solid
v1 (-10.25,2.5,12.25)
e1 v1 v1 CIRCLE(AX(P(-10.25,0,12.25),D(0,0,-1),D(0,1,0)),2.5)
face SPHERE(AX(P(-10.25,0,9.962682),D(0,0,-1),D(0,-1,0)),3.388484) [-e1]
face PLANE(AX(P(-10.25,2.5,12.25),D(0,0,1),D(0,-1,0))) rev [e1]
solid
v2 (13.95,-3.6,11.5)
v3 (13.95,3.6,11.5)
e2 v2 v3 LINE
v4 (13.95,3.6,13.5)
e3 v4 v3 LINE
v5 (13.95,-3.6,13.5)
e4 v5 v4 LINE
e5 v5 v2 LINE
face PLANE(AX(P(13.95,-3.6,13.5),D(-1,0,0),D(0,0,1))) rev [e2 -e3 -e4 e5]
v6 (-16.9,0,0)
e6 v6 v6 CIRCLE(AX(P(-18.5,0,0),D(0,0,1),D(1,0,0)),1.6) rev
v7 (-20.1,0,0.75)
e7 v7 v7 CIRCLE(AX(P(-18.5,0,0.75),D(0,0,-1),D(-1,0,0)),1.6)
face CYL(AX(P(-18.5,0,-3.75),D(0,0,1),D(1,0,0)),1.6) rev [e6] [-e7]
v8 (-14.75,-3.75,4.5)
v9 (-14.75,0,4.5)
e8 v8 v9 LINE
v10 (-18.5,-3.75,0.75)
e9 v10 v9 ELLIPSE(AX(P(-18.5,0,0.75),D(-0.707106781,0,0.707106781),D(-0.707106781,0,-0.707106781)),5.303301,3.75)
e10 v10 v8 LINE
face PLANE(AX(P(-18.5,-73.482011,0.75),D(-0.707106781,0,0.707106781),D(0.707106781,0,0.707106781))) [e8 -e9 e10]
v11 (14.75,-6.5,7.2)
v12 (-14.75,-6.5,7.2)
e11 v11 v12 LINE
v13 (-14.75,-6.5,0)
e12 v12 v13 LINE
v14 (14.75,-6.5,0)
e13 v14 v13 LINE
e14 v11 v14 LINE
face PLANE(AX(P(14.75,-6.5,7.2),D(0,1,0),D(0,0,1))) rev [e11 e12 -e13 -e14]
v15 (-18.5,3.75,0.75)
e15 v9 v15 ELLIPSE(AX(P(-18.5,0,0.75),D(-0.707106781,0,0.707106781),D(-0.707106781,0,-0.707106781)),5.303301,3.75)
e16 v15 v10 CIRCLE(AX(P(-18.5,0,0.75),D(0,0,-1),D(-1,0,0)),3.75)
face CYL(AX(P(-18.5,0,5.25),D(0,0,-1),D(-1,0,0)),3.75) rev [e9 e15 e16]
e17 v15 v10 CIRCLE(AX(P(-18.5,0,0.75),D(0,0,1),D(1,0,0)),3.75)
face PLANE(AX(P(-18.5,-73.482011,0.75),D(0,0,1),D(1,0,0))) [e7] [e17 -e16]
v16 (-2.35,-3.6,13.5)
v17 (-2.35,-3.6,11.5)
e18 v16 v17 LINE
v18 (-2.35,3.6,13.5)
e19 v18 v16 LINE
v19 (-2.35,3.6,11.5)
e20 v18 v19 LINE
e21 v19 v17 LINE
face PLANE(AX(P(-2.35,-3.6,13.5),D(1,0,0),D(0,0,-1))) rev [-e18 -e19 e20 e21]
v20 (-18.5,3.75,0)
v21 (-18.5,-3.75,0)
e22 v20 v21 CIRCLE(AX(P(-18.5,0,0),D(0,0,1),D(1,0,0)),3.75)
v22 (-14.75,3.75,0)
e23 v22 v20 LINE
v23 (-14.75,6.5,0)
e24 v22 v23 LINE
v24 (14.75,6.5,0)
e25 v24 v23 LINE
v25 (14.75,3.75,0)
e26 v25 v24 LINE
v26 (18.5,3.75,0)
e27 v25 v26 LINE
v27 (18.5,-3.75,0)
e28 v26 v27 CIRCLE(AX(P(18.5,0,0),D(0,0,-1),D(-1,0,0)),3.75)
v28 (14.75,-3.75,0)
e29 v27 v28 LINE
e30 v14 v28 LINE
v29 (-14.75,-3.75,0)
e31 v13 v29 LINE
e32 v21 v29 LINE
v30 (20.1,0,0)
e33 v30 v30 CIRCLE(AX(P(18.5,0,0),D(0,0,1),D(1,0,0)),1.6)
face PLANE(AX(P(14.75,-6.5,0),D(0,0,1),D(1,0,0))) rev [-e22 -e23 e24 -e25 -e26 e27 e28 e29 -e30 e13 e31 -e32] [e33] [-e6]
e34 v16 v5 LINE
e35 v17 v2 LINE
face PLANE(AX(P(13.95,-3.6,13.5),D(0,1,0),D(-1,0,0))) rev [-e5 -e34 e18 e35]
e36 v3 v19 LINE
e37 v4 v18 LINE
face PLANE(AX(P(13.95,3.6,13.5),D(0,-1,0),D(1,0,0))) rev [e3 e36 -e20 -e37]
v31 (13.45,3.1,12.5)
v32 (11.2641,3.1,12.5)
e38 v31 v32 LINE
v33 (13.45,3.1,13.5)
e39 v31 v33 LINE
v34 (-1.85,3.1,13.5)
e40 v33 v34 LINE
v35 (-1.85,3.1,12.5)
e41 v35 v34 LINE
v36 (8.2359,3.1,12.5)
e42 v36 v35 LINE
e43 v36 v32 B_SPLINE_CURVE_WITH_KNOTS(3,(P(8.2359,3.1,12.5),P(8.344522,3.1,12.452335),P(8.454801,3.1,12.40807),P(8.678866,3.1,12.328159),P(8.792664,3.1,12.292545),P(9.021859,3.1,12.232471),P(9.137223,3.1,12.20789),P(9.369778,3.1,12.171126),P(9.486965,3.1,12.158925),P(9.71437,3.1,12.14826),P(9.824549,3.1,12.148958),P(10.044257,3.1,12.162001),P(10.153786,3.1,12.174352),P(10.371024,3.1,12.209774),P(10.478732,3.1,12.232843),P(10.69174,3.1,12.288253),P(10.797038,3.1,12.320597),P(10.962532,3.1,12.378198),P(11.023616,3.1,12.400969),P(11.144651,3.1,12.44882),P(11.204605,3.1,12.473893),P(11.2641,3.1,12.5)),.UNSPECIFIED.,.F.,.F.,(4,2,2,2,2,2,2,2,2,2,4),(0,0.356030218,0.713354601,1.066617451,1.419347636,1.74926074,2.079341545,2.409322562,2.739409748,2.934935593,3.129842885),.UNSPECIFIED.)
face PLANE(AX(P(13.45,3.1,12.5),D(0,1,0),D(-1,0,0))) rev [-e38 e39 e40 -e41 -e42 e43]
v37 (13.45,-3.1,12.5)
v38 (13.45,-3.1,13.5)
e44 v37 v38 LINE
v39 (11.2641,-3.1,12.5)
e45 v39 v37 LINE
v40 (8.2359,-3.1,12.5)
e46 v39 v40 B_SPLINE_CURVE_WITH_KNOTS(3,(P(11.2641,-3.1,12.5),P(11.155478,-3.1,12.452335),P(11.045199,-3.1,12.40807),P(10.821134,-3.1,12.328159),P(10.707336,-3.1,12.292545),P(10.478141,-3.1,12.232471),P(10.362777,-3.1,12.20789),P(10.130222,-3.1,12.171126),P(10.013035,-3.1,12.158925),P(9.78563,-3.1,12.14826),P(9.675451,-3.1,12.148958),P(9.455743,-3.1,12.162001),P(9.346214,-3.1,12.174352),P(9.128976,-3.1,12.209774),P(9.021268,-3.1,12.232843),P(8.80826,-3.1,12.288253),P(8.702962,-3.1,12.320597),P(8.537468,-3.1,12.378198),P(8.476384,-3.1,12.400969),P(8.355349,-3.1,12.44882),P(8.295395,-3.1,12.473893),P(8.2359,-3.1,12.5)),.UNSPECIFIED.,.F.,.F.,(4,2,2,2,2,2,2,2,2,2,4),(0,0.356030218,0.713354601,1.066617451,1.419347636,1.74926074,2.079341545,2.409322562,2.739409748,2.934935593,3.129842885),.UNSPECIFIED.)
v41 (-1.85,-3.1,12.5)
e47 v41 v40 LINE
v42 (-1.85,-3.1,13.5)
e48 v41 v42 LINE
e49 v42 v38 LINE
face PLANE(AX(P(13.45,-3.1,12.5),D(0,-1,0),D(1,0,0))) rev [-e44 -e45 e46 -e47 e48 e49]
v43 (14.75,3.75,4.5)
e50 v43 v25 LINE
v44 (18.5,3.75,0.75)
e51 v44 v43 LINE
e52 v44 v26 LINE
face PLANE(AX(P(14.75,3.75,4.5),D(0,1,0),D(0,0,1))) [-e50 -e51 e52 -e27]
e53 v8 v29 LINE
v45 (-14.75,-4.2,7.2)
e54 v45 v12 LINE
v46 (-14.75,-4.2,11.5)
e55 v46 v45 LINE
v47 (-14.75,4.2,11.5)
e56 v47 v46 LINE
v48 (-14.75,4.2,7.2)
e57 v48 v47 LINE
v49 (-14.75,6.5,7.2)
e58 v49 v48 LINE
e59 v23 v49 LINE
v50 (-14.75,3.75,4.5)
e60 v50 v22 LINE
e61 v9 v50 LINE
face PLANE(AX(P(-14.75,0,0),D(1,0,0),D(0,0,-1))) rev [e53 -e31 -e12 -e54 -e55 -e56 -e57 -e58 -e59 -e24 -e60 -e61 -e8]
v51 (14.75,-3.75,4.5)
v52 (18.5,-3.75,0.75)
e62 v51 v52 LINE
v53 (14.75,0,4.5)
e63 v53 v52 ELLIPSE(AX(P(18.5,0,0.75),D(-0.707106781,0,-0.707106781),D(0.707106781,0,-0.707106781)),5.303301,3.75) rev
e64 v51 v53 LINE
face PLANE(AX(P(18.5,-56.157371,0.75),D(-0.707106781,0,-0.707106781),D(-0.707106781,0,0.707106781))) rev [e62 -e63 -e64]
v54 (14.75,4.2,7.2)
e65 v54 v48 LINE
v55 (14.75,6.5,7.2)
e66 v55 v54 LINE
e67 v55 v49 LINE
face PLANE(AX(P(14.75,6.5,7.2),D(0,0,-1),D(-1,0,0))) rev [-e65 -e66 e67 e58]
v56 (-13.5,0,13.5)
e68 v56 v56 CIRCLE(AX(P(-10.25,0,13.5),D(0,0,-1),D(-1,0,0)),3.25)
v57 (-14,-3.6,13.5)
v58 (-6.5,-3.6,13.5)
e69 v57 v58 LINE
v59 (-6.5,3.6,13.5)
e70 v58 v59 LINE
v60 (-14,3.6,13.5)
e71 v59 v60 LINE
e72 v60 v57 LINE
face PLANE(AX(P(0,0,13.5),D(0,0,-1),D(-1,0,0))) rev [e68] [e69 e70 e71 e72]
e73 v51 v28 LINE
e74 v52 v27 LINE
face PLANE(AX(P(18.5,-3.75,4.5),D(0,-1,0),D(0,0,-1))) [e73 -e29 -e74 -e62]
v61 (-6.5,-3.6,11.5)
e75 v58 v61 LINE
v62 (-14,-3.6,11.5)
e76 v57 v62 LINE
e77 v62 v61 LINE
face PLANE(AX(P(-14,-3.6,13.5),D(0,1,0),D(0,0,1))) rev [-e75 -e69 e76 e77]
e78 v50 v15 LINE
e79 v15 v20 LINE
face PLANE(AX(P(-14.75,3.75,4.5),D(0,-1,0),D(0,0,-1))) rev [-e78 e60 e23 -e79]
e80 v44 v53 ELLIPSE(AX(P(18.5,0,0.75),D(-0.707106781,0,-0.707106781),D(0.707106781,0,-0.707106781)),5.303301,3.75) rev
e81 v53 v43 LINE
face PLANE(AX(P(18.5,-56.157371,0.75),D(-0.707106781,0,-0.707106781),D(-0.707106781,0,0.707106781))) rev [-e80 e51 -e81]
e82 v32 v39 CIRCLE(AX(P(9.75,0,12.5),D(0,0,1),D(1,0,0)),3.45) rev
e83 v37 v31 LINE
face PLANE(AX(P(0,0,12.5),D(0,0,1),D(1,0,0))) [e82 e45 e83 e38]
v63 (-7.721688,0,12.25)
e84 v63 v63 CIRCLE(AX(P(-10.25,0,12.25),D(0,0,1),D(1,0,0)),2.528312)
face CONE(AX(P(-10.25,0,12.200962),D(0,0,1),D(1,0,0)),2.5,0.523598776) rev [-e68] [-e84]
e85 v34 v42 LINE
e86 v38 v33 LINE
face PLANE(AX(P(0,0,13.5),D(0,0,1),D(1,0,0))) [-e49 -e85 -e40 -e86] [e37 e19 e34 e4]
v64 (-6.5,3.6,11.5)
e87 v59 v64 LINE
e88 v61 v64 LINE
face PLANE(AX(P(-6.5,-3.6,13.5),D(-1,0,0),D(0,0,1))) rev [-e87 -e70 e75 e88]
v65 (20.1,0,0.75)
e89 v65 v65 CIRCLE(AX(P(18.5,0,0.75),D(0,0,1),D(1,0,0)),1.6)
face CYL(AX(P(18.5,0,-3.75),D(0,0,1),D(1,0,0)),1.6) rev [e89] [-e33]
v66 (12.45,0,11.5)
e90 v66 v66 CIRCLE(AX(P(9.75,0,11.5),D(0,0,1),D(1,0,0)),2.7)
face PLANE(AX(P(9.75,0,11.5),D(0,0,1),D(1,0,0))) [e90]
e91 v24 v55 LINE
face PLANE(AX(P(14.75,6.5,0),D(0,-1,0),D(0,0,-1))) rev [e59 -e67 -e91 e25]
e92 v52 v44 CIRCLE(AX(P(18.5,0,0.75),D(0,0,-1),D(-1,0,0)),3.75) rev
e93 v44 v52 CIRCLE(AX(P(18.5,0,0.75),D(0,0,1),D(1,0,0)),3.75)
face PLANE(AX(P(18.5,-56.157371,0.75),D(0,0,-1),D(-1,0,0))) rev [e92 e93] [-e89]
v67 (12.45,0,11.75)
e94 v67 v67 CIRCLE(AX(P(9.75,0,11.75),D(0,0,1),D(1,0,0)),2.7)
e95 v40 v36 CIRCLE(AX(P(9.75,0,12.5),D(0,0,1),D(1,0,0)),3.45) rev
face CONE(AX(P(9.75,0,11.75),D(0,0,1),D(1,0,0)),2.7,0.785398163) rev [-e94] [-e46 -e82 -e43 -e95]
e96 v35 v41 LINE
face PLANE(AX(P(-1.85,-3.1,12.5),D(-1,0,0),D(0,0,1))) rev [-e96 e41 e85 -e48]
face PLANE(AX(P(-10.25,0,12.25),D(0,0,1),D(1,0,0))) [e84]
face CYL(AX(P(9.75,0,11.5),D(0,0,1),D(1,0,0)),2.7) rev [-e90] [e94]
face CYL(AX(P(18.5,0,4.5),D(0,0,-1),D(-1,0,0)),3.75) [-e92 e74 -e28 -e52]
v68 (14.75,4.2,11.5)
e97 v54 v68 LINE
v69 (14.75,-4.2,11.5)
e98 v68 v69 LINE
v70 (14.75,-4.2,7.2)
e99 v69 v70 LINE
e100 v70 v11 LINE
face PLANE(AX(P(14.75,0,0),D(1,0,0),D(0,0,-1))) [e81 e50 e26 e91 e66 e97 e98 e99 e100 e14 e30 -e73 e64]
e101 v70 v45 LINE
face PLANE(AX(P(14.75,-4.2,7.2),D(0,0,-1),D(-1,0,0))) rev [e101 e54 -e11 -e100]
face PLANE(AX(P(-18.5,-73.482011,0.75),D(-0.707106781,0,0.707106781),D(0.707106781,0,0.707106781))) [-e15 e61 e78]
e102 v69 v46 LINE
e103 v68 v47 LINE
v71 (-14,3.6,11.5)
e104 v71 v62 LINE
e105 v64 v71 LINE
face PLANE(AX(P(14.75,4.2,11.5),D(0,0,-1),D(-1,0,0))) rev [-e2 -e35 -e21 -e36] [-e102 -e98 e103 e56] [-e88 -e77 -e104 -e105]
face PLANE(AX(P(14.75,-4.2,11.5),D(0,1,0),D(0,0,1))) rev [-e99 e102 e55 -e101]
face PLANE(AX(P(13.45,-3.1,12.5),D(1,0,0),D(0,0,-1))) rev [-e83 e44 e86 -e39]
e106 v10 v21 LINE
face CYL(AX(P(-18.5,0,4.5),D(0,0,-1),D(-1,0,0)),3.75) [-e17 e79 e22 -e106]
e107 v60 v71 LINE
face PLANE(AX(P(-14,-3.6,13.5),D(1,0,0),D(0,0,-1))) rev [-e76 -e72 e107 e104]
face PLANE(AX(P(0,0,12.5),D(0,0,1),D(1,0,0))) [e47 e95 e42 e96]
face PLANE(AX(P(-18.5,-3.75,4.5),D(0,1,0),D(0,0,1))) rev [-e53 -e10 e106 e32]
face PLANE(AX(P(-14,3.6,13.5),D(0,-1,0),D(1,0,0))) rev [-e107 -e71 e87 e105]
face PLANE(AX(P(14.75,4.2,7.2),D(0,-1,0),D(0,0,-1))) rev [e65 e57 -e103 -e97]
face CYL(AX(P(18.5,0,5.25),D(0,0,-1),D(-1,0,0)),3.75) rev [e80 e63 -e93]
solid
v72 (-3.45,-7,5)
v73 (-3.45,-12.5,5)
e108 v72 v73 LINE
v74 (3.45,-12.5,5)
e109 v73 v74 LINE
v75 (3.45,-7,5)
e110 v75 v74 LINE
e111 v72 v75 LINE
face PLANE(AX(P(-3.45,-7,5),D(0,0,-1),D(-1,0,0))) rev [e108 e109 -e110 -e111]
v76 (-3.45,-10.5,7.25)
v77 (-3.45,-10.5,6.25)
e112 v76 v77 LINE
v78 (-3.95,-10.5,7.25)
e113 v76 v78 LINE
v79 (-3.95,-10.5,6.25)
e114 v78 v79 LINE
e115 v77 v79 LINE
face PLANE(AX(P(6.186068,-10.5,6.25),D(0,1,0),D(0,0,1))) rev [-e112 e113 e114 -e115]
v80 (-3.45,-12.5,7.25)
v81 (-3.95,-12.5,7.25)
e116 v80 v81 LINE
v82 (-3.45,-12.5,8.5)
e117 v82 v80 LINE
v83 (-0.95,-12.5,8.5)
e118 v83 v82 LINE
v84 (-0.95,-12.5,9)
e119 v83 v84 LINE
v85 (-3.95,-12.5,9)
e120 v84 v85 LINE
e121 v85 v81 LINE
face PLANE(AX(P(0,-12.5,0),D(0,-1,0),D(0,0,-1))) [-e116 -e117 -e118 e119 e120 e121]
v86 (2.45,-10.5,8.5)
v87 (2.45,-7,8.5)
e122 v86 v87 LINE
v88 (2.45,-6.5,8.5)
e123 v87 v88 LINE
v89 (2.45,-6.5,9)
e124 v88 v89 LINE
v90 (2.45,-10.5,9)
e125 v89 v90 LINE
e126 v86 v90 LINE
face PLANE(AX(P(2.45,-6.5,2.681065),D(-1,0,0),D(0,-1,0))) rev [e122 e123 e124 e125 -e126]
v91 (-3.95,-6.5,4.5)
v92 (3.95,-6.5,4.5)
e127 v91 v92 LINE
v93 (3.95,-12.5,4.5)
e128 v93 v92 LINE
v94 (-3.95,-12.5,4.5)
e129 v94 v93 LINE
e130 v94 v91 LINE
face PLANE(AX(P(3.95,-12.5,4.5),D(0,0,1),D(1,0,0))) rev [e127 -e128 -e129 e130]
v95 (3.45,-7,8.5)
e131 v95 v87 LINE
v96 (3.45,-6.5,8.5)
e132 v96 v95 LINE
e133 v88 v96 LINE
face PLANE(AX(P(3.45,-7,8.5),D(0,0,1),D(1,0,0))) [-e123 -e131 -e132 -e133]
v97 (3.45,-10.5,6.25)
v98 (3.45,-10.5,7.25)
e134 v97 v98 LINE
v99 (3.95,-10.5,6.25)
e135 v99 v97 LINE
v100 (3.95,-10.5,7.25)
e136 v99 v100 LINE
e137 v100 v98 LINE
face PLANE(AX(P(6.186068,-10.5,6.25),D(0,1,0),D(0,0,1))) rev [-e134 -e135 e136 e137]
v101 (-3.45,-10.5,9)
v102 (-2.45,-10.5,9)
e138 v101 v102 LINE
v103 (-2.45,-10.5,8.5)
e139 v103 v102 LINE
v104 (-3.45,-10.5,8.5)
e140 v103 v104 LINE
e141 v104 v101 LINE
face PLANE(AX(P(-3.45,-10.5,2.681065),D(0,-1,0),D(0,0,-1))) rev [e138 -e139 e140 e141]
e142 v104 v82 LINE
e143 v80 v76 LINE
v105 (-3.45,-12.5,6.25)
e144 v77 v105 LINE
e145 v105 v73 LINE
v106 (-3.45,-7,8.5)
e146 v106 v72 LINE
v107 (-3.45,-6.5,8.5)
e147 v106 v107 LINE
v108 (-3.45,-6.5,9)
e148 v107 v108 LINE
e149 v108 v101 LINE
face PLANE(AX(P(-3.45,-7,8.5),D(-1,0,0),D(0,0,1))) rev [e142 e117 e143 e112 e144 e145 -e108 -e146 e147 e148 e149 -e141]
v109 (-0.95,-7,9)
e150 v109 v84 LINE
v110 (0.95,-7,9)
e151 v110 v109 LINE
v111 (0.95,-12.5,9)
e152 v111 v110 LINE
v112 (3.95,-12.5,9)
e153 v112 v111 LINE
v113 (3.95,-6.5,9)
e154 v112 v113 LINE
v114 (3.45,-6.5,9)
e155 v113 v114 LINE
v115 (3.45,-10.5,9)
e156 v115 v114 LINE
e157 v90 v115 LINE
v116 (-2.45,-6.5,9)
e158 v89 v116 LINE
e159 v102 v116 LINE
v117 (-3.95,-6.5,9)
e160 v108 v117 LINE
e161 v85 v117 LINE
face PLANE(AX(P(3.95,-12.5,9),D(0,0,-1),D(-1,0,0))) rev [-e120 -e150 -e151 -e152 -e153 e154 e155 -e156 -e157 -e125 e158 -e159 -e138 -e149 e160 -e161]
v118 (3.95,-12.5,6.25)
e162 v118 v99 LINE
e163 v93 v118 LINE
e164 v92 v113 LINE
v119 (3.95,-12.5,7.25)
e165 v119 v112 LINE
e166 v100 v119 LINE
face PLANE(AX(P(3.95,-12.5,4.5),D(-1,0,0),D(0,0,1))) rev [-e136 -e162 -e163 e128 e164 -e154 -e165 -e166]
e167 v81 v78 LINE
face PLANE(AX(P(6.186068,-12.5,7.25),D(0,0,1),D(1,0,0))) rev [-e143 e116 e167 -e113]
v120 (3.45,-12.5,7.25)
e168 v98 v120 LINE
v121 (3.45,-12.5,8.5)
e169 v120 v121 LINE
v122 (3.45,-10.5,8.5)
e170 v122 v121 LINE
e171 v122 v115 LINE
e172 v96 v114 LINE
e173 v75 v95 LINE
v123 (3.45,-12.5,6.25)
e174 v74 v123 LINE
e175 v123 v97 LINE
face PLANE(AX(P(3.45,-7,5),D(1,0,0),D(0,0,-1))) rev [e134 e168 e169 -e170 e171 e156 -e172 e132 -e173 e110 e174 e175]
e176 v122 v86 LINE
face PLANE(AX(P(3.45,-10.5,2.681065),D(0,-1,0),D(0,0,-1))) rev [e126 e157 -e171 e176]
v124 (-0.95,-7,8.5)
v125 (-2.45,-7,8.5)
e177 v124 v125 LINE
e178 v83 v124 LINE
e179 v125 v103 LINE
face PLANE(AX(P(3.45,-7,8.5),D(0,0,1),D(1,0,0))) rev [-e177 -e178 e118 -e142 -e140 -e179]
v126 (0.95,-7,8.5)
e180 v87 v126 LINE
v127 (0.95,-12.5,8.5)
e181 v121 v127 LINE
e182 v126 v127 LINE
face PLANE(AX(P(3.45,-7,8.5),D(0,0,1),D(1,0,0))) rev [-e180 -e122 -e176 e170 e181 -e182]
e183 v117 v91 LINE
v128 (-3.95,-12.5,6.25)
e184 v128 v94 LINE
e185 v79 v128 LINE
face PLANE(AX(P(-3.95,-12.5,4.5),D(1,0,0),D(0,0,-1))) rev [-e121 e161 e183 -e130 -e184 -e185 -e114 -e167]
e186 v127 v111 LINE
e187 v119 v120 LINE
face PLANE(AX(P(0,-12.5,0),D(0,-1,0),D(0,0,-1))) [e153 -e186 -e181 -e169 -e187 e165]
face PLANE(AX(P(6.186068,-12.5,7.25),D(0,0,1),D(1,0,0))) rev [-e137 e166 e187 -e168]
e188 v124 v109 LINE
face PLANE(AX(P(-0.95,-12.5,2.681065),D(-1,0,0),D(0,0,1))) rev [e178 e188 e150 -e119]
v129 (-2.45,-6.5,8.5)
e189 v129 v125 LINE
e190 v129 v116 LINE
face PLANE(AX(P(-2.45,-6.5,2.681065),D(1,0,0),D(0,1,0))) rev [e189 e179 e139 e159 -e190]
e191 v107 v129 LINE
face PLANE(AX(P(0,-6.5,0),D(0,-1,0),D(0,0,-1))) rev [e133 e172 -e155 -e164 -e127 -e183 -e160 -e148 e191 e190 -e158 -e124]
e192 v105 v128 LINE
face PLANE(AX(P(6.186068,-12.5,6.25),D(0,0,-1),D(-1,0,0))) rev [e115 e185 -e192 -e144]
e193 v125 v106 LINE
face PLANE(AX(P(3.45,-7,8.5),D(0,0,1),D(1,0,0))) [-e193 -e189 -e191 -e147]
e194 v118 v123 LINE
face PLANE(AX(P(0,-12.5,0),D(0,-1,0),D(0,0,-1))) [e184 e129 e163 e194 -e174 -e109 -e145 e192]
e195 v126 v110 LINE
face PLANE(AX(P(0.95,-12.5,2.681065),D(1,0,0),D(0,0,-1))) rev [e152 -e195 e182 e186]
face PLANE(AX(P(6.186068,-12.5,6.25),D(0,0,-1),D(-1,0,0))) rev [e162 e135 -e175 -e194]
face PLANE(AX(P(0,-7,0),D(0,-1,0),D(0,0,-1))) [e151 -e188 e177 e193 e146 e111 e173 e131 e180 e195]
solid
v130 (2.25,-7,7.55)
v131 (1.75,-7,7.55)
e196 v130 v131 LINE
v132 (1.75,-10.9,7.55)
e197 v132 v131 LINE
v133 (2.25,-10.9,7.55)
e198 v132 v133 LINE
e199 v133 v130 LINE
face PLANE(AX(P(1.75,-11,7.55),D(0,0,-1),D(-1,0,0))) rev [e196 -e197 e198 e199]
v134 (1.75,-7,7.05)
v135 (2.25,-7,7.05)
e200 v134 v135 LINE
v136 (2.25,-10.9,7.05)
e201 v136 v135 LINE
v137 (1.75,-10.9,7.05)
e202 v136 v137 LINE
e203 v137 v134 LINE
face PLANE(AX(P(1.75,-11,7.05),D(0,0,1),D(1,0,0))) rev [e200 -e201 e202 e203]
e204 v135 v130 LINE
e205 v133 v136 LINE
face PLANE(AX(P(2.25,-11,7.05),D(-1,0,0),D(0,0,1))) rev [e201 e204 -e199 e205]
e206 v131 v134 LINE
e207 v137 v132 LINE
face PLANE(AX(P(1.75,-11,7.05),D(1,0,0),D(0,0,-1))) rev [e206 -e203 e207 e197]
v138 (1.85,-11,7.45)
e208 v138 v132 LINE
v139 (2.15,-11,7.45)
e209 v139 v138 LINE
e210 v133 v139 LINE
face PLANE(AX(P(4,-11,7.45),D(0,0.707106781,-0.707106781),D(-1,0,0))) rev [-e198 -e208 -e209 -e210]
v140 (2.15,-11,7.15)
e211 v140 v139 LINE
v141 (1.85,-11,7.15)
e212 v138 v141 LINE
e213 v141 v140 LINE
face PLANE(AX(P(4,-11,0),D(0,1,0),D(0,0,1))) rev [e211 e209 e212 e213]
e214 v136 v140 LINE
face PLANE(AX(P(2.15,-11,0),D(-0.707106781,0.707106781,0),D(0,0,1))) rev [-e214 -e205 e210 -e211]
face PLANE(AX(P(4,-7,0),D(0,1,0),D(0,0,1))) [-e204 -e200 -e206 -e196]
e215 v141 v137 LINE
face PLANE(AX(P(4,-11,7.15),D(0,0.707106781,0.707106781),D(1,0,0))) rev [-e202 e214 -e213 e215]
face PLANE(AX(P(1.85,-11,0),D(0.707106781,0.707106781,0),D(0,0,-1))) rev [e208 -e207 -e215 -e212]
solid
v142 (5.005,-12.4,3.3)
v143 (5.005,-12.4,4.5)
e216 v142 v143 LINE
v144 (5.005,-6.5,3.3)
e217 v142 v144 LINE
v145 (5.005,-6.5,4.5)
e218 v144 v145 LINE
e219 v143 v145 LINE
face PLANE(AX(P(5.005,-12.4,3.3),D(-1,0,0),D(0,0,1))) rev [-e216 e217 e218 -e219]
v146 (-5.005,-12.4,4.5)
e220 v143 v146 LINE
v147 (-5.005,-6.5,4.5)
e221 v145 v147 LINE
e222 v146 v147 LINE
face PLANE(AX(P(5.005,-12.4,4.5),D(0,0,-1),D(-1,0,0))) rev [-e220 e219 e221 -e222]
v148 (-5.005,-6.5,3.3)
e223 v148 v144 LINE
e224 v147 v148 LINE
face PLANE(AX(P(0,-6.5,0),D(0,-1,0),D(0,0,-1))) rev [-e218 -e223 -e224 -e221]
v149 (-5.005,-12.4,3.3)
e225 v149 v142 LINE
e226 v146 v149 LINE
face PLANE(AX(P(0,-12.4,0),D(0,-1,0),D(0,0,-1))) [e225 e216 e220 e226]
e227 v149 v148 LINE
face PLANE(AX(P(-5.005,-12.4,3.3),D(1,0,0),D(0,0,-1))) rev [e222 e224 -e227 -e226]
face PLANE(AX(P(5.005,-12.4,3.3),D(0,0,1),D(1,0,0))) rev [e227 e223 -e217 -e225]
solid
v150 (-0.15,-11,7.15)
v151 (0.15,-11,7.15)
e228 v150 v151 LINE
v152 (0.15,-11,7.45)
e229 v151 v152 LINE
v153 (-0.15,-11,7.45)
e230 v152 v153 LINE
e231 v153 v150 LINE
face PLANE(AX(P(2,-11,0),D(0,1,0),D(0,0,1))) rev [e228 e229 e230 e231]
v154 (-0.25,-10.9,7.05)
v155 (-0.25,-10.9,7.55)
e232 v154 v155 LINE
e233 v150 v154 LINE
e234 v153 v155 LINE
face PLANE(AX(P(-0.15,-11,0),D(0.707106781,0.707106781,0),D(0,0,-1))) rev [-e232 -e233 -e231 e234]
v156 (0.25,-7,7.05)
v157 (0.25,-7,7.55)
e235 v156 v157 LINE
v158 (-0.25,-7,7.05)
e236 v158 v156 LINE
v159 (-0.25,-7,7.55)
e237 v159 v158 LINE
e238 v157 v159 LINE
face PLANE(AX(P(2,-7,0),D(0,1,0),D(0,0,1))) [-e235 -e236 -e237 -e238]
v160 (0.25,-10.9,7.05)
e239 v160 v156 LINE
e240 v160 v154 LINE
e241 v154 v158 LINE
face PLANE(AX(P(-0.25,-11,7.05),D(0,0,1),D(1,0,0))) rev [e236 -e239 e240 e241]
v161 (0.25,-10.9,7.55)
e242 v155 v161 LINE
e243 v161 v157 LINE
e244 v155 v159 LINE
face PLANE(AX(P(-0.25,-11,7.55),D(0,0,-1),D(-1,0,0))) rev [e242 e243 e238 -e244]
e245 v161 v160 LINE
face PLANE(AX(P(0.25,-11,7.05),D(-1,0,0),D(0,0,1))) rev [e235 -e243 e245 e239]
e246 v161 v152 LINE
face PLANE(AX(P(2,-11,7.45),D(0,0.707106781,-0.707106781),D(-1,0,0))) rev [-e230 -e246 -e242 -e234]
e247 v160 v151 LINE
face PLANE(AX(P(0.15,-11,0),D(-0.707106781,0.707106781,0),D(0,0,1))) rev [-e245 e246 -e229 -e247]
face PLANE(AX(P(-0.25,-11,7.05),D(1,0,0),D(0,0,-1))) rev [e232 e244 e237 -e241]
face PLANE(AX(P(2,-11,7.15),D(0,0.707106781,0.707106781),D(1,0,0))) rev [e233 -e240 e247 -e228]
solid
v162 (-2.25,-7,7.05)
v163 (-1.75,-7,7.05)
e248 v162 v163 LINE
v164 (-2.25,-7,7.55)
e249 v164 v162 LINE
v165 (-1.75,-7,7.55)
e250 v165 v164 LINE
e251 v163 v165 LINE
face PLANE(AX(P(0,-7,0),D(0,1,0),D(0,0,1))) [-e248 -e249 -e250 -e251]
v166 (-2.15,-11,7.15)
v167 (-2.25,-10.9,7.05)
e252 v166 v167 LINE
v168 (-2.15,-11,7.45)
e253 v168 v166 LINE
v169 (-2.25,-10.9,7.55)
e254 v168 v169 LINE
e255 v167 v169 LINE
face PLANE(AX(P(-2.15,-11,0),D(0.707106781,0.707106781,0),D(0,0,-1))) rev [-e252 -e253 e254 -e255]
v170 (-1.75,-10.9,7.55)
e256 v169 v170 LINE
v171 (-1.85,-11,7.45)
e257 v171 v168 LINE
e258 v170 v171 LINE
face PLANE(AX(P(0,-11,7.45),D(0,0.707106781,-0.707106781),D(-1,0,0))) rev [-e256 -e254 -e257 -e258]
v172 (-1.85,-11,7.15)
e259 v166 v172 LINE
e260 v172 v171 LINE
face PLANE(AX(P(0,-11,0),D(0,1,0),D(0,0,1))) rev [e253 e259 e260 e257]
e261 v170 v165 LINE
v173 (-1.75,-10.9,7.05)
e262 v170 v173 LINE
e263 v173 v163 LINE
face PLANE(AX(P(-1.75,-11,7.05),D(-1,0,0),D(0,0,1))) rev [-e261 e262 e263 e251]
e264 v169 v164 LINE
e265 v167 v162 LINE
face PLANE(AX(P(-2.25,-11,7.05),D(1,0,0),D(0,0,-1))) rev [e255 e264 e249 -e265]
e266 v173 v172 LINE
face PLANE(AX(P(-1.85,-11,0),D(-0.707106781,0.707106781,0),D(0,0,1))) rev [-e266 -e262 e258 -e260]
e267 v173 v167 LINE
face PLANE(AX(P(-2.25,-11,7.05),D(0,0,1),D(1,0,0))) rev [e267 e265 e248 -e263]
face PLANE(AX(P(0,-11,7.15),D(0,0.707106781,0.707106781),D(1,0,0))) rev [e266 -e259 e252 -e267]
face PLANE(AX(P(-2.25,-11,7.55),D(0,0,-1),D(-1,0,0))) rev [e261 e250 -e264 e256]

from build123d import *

# Parameters (mm, degrees)
BOSS_EXTRUDE5_DEPTH  = 14.75
SKETCH9_W            = 7.5
SKETCH9_H            = 7.2
SKETCH9_W_2          = 16.3
BOSS_EXTRUDE6_DEPTH  = 2
SKETCH10_W           = 15.3
SKETCH10_H           = 6.2
CUT_EXTRUDE4_DEPTH   = 1
SKETCH11_R           = 2.5
CUT_EXTRUDE5_DEPTH   = 1.25
BOSS_EXTRUDE7_DEPTH  = 4.5
CUT_EXTRUDE7_START   = -7.5
CUT_EXTRUDE7_DEPTH   = 7.5
SKETCH18_R           = 3.75
CUT_EXTRUDE8_DEPTH   = 4.5
SKETCH19_R           = 1.6
CUT_EXTRUDE9_DEPTH   = 4.5
CHAMFER1_SIZE        = 0.75
CHAMFER1_SIZE_2      = 1.299038106
SKETCH13_R           = 2.7
CUT_EXTRUDE6_DEPTH   = 1
CHAMFER2_SIZE        = 0.75
SKETCH20_W           = 10.01
SKETCH20_H           = 1.2
BOSS_EXTRUDE8_DEPTH  = 5.9
SKETCH21_W           = 7.9
SKETCH21_H           = 4.5
BOSS_EXTRUDE9_DEPTH  = 6
SKETCH23_W           = 6.9
SKETCH23_H           = 3.5
CUT_EXTRUDE11_DEPTH  = 5.5
SKETCH24_W           = 1.9
SKETCH24_H           = 5.5
SKETCH24_W_2         = 1
SKETCH24_H_2         = 4
CUT_EXTRUDE12_DEPTH  = 0.5
CUT_EXTRUDE13_REACH  = 34.015
SKETCH25_W           = 1
SKETCH25_H           = 2
SKETCH26_W           = 0.5
SKETCH26_H           = 0.5
BOSS_EXTRUDE10_DEPTH = 4
CHAMFER3_SIZE        = 0.1
LPATTERN1_COUNT      = 3
LPATTERN1_PITCH      = 2


# Read off the part's stored shape, not the designer's step: Cut-Extrude7
with BuildPart() as part:
    # Sketch8 → Boss-Extrude5 (new, symmetric)
    with BuildSketch(Plane(origin=(0, 0, 0), x_dir=(0, 0, -1), z_dir=(1, 0, 0))):
        Polygon((0, -6.5), (0, 6.5), (-7.2, 6.5), (-7.2, 4.2), (-11.5, 4.2), (-11.5, -4.2), (-7.2, -4.2), (-7.2, -6.5), align=None)
    extrude(amount=BOSS_EXTRUDE5_DEPTH, both=True)

    # Sketch9 → Boss-Extrude6 (add)
    with BuildSketch(Plane.XY.offset(11.5)):
        with Locations((-10.25, 0)):
            Rectangle(SKETCH9_W, SKETCH9_H)
        with Locations((5.8, 0)):
            Rectangle(SKETCH9_W_2, SKETCH9_H)
    extrude(amount=BOSS_EXTRUDE6_DEPTH)

    # Sketch10 → Cut-Extrude4 (cut)
    with BuildSketch(Plane.XY.offset(13.5)):
        with Locations((5.8, 0)):
            Rectangle(SKETCH10_W, SKETCH10_H)
    extrude(amount=-CUT_EXTRUDE4_DEPTH, mode=Mode.SUBTRACT)

    # Sketch11 → Cut-Extrude5 (cut)
    with BuildSketch(Plane.XY.offset(13.5)):
        with Locations((-10.25, 0)):
            Circle(SKETCH11_R)
    extrude(amount=-CUT_EXTRUDE5_DEPTH, mode=Mode.SUBTRACT)

    # Sketch16 → Boss-Extrude7 (add)
    with BuildSketch(Plane(origin=(0, 0, 0), x_dir=(-1, 0, 0), z_dir=(0, 0, -1))):
        with BuildLine():
            Line((-14.75, -3.75), (-14.75, 3.75))
            Line((-14.75, 3.75), (-18.5, 3.75))
            ThreePointArc((-18.5, 3.75), (-22.25, 0), (-18.5, -3.75))
            Line((-18.5, -3.75), (-14.75, -3.75))
        make_face()
    boss_extrude7 = extrude(amount=-BOSS_EXTRUDE7_DEPTH)

    # Cut-Extrude7 outline → Cut-Extrude7 (cut)
    with BuildSketch(Plane.XZ.offset(3.75).offset(CUT_EXTRUDE7_START)):
        Polygon((14.75, 4.5), (18.5, 0.75), (24, 0.75), (24, 4.5), align=None)
    cut_extrude7 = extrude(amount=CUT_EXTRUDE7_DEPTH, mode=Mode.SUBTRACT)

    # Sketch18 → Cut-Extrude8 (cut)
    with BuildSketch(Plane.XY.offset(0.75)):
        with Locations((18.5, 0)):
            Circle(SKETCH18_R)
    cut_extrude8 = extrude(amount=CUT_EXTRUDE8_DEPTH, mode=Mode.SUBTRACT)

    # Sketch19 → Cut-Extrude9 (cut)
    with BuildSketch(Plane.XY.offset(0.75)):
        with Locations((18.5, 0)):
            Circle(SKETCH19_R)
    cut_extrude9 = extrude(amount=-CUT_EXTRUDE9_DEPTH, mode=Mode.SUBTRACT)

    # Mirror1: Boss-Extrude7, Cut-Extrude7, Cut-Extrude8, Cut-Extrude9 across plane
    add(boss_extrude7.mirror(Plane(origin=(0, 0, 0), x_dir=(0, 0, 1), z_dir=(1, 0, 0))))
    add(cut_extrude7.mirror(Plane(origin=(0, 0, 0), x_dir=(0, 0, 1), z_dir=(1, 0, 0))), mode=Mode.SUBTRACT)
    add(cut_extrude8.mirror(Plane(origin=(0, 0, 0), x_dir=(0, 0, 1), z_dir=(1, 0, 0))), mode=Mode.SUBTRACT)
    add(cut_extrude9.mirror(Plane(origin=(0, 0, 0), x_dir=(0, 0, 1), z_dir=(1, 0, 0))), mode=Mode.SUBTRACT)

    # Chamfer1
    # the kernel refuses this chamfer: 1.299038106, 0.75 mm, written as the material it takes off along each edge
    with BuildSketch(Plane(origin=(-10.25, 0, 13.5), x_dir=(1, 0, 0), z_dir=(0, -1, 0))) as chamfer1_piece_1_section:
        Polygon((2.5 + CHAMFER1_SIZE, 0), (2.5, -CHAMFER1_SIZE_2), (2.5, 0), align=None)
    chamfer1_piece_1 = revolve(axis=Axis((-10.25, 0, 13.5), (0, 0, 1)), mode=Mode.PRIVATE)
    chamfer1_piece_1 = split(chamfer1_piece_1, bisect_by=Plane(origin=(-13.133837987, 0, 12.25), z_dir=(0, 0, 1)), keep=Keep.TOP, mode=Mode.PRIVATE)
    add(chamfer1_piece_1, mode=Mode.SUBTRACT)

    # Sketch13 → Cut-Extrude6 (cut)
    with BuildSketch(Plane.XY.offset(12.5)):
        with Locations((9.75, 0)):
            Circle(SKETCH13_R)
    extrude(amount=-CUT_EXTRUDE6_DEPTH, mode=Mode.SUBTRACT)

    # Chamfer2
    # the kernel refuses this chamfer: 0.75 mm, written as the material it takes off along each edge
    with BuildSketch(Plane(origin=(9.75, 0, 12.5), x_dir=(1, 0, 0), z_dir=(0, -1, 0))) as chamfer2_piece_1_section:
        Polygon((2.7 + CHAMFER2_SIZE, 0), (2.7, -CHAMFER2_SIZE), (2.7, 0), align=None)
    chamfer2_piece_1 = revolve(axis=Axis((9.75, 0, 12.5), (0, 0, 1)), mode=Mode.PRIVATE)
    chamfer2_piece_1 = split(chamfer2_piece_1, bisect_by=Plane(origin=(6.68747717, -3.1, 12.13747717), z_dir=(0, 1, 0)), keep=Keep.TOP, mode=Mode.PRIVATE)
    chamfer2_piece_1 = split(chamfer2_piece_1, bisect_by=Plane(origin=(6.68747717, 3.1, 12.13747717), z_dir=(0, -1, 0)), keep=Keep.TOP, mode=Mode.PRIVATE)
    add(chamfer2_piece_1, mode=Mode.SUBTRACT)


with BuildPart() as body_2:
    # Sketch12 → Revolve1 (revolve)
    with BuildSketch(Plane.ZY.offset(10.25), mode=Mode.PRIVATE) as revolve1_sk:
        with BuildLine():
            Line((12.25, 2.5), (12.25, 0))
            Line((12.25, 0), (13.351165831, 0))
            ThreePointArc((13.351165831, 0), (13.063678836, 1.365884895), (12.25, 2.5))
        make_face()
    revolve(revolve1_sk.sketch.rotate(Axis((-10.25, 0, 12.25), (0, 0, 1)), 180), axis=Axis((-10.25, 0, 12.25), (0, 0, 1)))


with BuildPart() as body_3:
    # Sketch20 → Boss-Extrude8 (new body)
    with BuildSketch(Plane.XZ.offset(6.5)):
        with Locations((0, 3.9)):
            Rectangle(SKETCH20_W, SKETCH20_H)
    extrude(amount=BOSS_EXTRUDE8_DEPTH)


with BuildPart() as body_4:
    # Sketch21 → Boss-Extrude9 (new body)
    with BuildSketch(Plane.XZ.offset(6.5)):
        with Locations((0, 6.75)):
            Rectangle(SKETCH21_W, SKETCH21_H)
    extrude(amount=BOSS_EXTRUDE9_DEPTH)

    # Sketch23 → Cut-Extrude11 (cut)
    with BuildSketch(Plane.XZ.offset(12.5)):
        with Locations((0, 6.75)):
            Rectangle(SKETCH23_W, SKETCH23_H)
    extrude(amount=-CUT_EXTRUDE11_DEPTH, mode=Mode.SUBTRACT)

    # Sketch24 → Cut-Extrude12 (cut)
    with BuildSketch(Plane.XY.offset(9)):
        with Locations((0, -9.75)):
            Rectangle(SKETCH24_W, SKETCH24_H)
        with Locations((-2.95, -8.5)):
            Rectangle(SKETCH24_W_2, SKETCH24_H_2)
        with Locations((2.95, -8.5)):
            Rectangle(SKETCH24_W_2, SKETCH24_H_2)
    extrude(amount=-CUT_EXTRUDE12_DEPTH, mode=Mode.SUBTRACT)

    # Cut-Extrude13: up to this face of the body (flat: up to its plane)
    cut_extrude13_end = Plane(body_4.part.faces().sort_by_distance((3.95, -9.5, 6.75))[0])
    # Sketch25 → Cut-Extrude13 (cut, up to the picked face)
    with BuildSketch(Plane.ZY.offset(3.95), mode=Mode.PRIVATE) as cut_extrude13_sk1:
        with Locations((6.75, -11.5)):
            Rectangle(SKETCH25_W, SKETCH25_H)
    cut_extrude13_tool1 = split(extrude(cut_extrude13_sk1.sketch, amount=-CUT_EXTRUDE13_REACH, mode=Mode.PRIVATE), bisect_by=cut_extrude13_end, keep=Keep.BOTH, mode=Mode.PRIVATE)
    add(cut_extrude13_tool1.solids().sort_by(Axis((-3.95, -11.5, 6.75), (1, 0, 0)))[0], mode=Mode.SUBTRACT)


with BuildPart() as body_5:
    # Sketch26 → Boss-Extrude10 (new body)
    with BuildSketch(Plane.XZ.offset(7)):
        with Locations((-2, 7.3)):
            Rectangle(SKETCH26_W, SKETCH26_H)
    extrude(amount=BOSS_EXTRUDE10_DEPTH)

    # Chamfer3
    chamfer3_edges = [body_5.edges().sort_by_distance(p)[0] for p in [
        (-2.25, -11, 7.3),
        (-2, -11, 7.05),
        (-1.75, -11, 7.3),
        (-2, -11, 7.55),
    ]]
    chamfer(chamfer3_edges, length=CHAMFER3_SIZE)


with BuildPart() as lpattern1_1:
    # LPattern1: pattern copy
    add(body_5.part.moved(Location(Vector(1, 0, 0) * (1 * LPATTERN1_PITCH))))


with BuildPart() as lpattern1_2:
    # LPattern1: pattern copy
    add(body_5.part.moved(Location(Vector(1, 0, 0) * (2 * LPATTERN1_PITCH))))


solid = Compound([part.part, body_2.part, body_3.part, body_4.part, body_5.part, lpattern1_1.part, lpattern1_2.part])
